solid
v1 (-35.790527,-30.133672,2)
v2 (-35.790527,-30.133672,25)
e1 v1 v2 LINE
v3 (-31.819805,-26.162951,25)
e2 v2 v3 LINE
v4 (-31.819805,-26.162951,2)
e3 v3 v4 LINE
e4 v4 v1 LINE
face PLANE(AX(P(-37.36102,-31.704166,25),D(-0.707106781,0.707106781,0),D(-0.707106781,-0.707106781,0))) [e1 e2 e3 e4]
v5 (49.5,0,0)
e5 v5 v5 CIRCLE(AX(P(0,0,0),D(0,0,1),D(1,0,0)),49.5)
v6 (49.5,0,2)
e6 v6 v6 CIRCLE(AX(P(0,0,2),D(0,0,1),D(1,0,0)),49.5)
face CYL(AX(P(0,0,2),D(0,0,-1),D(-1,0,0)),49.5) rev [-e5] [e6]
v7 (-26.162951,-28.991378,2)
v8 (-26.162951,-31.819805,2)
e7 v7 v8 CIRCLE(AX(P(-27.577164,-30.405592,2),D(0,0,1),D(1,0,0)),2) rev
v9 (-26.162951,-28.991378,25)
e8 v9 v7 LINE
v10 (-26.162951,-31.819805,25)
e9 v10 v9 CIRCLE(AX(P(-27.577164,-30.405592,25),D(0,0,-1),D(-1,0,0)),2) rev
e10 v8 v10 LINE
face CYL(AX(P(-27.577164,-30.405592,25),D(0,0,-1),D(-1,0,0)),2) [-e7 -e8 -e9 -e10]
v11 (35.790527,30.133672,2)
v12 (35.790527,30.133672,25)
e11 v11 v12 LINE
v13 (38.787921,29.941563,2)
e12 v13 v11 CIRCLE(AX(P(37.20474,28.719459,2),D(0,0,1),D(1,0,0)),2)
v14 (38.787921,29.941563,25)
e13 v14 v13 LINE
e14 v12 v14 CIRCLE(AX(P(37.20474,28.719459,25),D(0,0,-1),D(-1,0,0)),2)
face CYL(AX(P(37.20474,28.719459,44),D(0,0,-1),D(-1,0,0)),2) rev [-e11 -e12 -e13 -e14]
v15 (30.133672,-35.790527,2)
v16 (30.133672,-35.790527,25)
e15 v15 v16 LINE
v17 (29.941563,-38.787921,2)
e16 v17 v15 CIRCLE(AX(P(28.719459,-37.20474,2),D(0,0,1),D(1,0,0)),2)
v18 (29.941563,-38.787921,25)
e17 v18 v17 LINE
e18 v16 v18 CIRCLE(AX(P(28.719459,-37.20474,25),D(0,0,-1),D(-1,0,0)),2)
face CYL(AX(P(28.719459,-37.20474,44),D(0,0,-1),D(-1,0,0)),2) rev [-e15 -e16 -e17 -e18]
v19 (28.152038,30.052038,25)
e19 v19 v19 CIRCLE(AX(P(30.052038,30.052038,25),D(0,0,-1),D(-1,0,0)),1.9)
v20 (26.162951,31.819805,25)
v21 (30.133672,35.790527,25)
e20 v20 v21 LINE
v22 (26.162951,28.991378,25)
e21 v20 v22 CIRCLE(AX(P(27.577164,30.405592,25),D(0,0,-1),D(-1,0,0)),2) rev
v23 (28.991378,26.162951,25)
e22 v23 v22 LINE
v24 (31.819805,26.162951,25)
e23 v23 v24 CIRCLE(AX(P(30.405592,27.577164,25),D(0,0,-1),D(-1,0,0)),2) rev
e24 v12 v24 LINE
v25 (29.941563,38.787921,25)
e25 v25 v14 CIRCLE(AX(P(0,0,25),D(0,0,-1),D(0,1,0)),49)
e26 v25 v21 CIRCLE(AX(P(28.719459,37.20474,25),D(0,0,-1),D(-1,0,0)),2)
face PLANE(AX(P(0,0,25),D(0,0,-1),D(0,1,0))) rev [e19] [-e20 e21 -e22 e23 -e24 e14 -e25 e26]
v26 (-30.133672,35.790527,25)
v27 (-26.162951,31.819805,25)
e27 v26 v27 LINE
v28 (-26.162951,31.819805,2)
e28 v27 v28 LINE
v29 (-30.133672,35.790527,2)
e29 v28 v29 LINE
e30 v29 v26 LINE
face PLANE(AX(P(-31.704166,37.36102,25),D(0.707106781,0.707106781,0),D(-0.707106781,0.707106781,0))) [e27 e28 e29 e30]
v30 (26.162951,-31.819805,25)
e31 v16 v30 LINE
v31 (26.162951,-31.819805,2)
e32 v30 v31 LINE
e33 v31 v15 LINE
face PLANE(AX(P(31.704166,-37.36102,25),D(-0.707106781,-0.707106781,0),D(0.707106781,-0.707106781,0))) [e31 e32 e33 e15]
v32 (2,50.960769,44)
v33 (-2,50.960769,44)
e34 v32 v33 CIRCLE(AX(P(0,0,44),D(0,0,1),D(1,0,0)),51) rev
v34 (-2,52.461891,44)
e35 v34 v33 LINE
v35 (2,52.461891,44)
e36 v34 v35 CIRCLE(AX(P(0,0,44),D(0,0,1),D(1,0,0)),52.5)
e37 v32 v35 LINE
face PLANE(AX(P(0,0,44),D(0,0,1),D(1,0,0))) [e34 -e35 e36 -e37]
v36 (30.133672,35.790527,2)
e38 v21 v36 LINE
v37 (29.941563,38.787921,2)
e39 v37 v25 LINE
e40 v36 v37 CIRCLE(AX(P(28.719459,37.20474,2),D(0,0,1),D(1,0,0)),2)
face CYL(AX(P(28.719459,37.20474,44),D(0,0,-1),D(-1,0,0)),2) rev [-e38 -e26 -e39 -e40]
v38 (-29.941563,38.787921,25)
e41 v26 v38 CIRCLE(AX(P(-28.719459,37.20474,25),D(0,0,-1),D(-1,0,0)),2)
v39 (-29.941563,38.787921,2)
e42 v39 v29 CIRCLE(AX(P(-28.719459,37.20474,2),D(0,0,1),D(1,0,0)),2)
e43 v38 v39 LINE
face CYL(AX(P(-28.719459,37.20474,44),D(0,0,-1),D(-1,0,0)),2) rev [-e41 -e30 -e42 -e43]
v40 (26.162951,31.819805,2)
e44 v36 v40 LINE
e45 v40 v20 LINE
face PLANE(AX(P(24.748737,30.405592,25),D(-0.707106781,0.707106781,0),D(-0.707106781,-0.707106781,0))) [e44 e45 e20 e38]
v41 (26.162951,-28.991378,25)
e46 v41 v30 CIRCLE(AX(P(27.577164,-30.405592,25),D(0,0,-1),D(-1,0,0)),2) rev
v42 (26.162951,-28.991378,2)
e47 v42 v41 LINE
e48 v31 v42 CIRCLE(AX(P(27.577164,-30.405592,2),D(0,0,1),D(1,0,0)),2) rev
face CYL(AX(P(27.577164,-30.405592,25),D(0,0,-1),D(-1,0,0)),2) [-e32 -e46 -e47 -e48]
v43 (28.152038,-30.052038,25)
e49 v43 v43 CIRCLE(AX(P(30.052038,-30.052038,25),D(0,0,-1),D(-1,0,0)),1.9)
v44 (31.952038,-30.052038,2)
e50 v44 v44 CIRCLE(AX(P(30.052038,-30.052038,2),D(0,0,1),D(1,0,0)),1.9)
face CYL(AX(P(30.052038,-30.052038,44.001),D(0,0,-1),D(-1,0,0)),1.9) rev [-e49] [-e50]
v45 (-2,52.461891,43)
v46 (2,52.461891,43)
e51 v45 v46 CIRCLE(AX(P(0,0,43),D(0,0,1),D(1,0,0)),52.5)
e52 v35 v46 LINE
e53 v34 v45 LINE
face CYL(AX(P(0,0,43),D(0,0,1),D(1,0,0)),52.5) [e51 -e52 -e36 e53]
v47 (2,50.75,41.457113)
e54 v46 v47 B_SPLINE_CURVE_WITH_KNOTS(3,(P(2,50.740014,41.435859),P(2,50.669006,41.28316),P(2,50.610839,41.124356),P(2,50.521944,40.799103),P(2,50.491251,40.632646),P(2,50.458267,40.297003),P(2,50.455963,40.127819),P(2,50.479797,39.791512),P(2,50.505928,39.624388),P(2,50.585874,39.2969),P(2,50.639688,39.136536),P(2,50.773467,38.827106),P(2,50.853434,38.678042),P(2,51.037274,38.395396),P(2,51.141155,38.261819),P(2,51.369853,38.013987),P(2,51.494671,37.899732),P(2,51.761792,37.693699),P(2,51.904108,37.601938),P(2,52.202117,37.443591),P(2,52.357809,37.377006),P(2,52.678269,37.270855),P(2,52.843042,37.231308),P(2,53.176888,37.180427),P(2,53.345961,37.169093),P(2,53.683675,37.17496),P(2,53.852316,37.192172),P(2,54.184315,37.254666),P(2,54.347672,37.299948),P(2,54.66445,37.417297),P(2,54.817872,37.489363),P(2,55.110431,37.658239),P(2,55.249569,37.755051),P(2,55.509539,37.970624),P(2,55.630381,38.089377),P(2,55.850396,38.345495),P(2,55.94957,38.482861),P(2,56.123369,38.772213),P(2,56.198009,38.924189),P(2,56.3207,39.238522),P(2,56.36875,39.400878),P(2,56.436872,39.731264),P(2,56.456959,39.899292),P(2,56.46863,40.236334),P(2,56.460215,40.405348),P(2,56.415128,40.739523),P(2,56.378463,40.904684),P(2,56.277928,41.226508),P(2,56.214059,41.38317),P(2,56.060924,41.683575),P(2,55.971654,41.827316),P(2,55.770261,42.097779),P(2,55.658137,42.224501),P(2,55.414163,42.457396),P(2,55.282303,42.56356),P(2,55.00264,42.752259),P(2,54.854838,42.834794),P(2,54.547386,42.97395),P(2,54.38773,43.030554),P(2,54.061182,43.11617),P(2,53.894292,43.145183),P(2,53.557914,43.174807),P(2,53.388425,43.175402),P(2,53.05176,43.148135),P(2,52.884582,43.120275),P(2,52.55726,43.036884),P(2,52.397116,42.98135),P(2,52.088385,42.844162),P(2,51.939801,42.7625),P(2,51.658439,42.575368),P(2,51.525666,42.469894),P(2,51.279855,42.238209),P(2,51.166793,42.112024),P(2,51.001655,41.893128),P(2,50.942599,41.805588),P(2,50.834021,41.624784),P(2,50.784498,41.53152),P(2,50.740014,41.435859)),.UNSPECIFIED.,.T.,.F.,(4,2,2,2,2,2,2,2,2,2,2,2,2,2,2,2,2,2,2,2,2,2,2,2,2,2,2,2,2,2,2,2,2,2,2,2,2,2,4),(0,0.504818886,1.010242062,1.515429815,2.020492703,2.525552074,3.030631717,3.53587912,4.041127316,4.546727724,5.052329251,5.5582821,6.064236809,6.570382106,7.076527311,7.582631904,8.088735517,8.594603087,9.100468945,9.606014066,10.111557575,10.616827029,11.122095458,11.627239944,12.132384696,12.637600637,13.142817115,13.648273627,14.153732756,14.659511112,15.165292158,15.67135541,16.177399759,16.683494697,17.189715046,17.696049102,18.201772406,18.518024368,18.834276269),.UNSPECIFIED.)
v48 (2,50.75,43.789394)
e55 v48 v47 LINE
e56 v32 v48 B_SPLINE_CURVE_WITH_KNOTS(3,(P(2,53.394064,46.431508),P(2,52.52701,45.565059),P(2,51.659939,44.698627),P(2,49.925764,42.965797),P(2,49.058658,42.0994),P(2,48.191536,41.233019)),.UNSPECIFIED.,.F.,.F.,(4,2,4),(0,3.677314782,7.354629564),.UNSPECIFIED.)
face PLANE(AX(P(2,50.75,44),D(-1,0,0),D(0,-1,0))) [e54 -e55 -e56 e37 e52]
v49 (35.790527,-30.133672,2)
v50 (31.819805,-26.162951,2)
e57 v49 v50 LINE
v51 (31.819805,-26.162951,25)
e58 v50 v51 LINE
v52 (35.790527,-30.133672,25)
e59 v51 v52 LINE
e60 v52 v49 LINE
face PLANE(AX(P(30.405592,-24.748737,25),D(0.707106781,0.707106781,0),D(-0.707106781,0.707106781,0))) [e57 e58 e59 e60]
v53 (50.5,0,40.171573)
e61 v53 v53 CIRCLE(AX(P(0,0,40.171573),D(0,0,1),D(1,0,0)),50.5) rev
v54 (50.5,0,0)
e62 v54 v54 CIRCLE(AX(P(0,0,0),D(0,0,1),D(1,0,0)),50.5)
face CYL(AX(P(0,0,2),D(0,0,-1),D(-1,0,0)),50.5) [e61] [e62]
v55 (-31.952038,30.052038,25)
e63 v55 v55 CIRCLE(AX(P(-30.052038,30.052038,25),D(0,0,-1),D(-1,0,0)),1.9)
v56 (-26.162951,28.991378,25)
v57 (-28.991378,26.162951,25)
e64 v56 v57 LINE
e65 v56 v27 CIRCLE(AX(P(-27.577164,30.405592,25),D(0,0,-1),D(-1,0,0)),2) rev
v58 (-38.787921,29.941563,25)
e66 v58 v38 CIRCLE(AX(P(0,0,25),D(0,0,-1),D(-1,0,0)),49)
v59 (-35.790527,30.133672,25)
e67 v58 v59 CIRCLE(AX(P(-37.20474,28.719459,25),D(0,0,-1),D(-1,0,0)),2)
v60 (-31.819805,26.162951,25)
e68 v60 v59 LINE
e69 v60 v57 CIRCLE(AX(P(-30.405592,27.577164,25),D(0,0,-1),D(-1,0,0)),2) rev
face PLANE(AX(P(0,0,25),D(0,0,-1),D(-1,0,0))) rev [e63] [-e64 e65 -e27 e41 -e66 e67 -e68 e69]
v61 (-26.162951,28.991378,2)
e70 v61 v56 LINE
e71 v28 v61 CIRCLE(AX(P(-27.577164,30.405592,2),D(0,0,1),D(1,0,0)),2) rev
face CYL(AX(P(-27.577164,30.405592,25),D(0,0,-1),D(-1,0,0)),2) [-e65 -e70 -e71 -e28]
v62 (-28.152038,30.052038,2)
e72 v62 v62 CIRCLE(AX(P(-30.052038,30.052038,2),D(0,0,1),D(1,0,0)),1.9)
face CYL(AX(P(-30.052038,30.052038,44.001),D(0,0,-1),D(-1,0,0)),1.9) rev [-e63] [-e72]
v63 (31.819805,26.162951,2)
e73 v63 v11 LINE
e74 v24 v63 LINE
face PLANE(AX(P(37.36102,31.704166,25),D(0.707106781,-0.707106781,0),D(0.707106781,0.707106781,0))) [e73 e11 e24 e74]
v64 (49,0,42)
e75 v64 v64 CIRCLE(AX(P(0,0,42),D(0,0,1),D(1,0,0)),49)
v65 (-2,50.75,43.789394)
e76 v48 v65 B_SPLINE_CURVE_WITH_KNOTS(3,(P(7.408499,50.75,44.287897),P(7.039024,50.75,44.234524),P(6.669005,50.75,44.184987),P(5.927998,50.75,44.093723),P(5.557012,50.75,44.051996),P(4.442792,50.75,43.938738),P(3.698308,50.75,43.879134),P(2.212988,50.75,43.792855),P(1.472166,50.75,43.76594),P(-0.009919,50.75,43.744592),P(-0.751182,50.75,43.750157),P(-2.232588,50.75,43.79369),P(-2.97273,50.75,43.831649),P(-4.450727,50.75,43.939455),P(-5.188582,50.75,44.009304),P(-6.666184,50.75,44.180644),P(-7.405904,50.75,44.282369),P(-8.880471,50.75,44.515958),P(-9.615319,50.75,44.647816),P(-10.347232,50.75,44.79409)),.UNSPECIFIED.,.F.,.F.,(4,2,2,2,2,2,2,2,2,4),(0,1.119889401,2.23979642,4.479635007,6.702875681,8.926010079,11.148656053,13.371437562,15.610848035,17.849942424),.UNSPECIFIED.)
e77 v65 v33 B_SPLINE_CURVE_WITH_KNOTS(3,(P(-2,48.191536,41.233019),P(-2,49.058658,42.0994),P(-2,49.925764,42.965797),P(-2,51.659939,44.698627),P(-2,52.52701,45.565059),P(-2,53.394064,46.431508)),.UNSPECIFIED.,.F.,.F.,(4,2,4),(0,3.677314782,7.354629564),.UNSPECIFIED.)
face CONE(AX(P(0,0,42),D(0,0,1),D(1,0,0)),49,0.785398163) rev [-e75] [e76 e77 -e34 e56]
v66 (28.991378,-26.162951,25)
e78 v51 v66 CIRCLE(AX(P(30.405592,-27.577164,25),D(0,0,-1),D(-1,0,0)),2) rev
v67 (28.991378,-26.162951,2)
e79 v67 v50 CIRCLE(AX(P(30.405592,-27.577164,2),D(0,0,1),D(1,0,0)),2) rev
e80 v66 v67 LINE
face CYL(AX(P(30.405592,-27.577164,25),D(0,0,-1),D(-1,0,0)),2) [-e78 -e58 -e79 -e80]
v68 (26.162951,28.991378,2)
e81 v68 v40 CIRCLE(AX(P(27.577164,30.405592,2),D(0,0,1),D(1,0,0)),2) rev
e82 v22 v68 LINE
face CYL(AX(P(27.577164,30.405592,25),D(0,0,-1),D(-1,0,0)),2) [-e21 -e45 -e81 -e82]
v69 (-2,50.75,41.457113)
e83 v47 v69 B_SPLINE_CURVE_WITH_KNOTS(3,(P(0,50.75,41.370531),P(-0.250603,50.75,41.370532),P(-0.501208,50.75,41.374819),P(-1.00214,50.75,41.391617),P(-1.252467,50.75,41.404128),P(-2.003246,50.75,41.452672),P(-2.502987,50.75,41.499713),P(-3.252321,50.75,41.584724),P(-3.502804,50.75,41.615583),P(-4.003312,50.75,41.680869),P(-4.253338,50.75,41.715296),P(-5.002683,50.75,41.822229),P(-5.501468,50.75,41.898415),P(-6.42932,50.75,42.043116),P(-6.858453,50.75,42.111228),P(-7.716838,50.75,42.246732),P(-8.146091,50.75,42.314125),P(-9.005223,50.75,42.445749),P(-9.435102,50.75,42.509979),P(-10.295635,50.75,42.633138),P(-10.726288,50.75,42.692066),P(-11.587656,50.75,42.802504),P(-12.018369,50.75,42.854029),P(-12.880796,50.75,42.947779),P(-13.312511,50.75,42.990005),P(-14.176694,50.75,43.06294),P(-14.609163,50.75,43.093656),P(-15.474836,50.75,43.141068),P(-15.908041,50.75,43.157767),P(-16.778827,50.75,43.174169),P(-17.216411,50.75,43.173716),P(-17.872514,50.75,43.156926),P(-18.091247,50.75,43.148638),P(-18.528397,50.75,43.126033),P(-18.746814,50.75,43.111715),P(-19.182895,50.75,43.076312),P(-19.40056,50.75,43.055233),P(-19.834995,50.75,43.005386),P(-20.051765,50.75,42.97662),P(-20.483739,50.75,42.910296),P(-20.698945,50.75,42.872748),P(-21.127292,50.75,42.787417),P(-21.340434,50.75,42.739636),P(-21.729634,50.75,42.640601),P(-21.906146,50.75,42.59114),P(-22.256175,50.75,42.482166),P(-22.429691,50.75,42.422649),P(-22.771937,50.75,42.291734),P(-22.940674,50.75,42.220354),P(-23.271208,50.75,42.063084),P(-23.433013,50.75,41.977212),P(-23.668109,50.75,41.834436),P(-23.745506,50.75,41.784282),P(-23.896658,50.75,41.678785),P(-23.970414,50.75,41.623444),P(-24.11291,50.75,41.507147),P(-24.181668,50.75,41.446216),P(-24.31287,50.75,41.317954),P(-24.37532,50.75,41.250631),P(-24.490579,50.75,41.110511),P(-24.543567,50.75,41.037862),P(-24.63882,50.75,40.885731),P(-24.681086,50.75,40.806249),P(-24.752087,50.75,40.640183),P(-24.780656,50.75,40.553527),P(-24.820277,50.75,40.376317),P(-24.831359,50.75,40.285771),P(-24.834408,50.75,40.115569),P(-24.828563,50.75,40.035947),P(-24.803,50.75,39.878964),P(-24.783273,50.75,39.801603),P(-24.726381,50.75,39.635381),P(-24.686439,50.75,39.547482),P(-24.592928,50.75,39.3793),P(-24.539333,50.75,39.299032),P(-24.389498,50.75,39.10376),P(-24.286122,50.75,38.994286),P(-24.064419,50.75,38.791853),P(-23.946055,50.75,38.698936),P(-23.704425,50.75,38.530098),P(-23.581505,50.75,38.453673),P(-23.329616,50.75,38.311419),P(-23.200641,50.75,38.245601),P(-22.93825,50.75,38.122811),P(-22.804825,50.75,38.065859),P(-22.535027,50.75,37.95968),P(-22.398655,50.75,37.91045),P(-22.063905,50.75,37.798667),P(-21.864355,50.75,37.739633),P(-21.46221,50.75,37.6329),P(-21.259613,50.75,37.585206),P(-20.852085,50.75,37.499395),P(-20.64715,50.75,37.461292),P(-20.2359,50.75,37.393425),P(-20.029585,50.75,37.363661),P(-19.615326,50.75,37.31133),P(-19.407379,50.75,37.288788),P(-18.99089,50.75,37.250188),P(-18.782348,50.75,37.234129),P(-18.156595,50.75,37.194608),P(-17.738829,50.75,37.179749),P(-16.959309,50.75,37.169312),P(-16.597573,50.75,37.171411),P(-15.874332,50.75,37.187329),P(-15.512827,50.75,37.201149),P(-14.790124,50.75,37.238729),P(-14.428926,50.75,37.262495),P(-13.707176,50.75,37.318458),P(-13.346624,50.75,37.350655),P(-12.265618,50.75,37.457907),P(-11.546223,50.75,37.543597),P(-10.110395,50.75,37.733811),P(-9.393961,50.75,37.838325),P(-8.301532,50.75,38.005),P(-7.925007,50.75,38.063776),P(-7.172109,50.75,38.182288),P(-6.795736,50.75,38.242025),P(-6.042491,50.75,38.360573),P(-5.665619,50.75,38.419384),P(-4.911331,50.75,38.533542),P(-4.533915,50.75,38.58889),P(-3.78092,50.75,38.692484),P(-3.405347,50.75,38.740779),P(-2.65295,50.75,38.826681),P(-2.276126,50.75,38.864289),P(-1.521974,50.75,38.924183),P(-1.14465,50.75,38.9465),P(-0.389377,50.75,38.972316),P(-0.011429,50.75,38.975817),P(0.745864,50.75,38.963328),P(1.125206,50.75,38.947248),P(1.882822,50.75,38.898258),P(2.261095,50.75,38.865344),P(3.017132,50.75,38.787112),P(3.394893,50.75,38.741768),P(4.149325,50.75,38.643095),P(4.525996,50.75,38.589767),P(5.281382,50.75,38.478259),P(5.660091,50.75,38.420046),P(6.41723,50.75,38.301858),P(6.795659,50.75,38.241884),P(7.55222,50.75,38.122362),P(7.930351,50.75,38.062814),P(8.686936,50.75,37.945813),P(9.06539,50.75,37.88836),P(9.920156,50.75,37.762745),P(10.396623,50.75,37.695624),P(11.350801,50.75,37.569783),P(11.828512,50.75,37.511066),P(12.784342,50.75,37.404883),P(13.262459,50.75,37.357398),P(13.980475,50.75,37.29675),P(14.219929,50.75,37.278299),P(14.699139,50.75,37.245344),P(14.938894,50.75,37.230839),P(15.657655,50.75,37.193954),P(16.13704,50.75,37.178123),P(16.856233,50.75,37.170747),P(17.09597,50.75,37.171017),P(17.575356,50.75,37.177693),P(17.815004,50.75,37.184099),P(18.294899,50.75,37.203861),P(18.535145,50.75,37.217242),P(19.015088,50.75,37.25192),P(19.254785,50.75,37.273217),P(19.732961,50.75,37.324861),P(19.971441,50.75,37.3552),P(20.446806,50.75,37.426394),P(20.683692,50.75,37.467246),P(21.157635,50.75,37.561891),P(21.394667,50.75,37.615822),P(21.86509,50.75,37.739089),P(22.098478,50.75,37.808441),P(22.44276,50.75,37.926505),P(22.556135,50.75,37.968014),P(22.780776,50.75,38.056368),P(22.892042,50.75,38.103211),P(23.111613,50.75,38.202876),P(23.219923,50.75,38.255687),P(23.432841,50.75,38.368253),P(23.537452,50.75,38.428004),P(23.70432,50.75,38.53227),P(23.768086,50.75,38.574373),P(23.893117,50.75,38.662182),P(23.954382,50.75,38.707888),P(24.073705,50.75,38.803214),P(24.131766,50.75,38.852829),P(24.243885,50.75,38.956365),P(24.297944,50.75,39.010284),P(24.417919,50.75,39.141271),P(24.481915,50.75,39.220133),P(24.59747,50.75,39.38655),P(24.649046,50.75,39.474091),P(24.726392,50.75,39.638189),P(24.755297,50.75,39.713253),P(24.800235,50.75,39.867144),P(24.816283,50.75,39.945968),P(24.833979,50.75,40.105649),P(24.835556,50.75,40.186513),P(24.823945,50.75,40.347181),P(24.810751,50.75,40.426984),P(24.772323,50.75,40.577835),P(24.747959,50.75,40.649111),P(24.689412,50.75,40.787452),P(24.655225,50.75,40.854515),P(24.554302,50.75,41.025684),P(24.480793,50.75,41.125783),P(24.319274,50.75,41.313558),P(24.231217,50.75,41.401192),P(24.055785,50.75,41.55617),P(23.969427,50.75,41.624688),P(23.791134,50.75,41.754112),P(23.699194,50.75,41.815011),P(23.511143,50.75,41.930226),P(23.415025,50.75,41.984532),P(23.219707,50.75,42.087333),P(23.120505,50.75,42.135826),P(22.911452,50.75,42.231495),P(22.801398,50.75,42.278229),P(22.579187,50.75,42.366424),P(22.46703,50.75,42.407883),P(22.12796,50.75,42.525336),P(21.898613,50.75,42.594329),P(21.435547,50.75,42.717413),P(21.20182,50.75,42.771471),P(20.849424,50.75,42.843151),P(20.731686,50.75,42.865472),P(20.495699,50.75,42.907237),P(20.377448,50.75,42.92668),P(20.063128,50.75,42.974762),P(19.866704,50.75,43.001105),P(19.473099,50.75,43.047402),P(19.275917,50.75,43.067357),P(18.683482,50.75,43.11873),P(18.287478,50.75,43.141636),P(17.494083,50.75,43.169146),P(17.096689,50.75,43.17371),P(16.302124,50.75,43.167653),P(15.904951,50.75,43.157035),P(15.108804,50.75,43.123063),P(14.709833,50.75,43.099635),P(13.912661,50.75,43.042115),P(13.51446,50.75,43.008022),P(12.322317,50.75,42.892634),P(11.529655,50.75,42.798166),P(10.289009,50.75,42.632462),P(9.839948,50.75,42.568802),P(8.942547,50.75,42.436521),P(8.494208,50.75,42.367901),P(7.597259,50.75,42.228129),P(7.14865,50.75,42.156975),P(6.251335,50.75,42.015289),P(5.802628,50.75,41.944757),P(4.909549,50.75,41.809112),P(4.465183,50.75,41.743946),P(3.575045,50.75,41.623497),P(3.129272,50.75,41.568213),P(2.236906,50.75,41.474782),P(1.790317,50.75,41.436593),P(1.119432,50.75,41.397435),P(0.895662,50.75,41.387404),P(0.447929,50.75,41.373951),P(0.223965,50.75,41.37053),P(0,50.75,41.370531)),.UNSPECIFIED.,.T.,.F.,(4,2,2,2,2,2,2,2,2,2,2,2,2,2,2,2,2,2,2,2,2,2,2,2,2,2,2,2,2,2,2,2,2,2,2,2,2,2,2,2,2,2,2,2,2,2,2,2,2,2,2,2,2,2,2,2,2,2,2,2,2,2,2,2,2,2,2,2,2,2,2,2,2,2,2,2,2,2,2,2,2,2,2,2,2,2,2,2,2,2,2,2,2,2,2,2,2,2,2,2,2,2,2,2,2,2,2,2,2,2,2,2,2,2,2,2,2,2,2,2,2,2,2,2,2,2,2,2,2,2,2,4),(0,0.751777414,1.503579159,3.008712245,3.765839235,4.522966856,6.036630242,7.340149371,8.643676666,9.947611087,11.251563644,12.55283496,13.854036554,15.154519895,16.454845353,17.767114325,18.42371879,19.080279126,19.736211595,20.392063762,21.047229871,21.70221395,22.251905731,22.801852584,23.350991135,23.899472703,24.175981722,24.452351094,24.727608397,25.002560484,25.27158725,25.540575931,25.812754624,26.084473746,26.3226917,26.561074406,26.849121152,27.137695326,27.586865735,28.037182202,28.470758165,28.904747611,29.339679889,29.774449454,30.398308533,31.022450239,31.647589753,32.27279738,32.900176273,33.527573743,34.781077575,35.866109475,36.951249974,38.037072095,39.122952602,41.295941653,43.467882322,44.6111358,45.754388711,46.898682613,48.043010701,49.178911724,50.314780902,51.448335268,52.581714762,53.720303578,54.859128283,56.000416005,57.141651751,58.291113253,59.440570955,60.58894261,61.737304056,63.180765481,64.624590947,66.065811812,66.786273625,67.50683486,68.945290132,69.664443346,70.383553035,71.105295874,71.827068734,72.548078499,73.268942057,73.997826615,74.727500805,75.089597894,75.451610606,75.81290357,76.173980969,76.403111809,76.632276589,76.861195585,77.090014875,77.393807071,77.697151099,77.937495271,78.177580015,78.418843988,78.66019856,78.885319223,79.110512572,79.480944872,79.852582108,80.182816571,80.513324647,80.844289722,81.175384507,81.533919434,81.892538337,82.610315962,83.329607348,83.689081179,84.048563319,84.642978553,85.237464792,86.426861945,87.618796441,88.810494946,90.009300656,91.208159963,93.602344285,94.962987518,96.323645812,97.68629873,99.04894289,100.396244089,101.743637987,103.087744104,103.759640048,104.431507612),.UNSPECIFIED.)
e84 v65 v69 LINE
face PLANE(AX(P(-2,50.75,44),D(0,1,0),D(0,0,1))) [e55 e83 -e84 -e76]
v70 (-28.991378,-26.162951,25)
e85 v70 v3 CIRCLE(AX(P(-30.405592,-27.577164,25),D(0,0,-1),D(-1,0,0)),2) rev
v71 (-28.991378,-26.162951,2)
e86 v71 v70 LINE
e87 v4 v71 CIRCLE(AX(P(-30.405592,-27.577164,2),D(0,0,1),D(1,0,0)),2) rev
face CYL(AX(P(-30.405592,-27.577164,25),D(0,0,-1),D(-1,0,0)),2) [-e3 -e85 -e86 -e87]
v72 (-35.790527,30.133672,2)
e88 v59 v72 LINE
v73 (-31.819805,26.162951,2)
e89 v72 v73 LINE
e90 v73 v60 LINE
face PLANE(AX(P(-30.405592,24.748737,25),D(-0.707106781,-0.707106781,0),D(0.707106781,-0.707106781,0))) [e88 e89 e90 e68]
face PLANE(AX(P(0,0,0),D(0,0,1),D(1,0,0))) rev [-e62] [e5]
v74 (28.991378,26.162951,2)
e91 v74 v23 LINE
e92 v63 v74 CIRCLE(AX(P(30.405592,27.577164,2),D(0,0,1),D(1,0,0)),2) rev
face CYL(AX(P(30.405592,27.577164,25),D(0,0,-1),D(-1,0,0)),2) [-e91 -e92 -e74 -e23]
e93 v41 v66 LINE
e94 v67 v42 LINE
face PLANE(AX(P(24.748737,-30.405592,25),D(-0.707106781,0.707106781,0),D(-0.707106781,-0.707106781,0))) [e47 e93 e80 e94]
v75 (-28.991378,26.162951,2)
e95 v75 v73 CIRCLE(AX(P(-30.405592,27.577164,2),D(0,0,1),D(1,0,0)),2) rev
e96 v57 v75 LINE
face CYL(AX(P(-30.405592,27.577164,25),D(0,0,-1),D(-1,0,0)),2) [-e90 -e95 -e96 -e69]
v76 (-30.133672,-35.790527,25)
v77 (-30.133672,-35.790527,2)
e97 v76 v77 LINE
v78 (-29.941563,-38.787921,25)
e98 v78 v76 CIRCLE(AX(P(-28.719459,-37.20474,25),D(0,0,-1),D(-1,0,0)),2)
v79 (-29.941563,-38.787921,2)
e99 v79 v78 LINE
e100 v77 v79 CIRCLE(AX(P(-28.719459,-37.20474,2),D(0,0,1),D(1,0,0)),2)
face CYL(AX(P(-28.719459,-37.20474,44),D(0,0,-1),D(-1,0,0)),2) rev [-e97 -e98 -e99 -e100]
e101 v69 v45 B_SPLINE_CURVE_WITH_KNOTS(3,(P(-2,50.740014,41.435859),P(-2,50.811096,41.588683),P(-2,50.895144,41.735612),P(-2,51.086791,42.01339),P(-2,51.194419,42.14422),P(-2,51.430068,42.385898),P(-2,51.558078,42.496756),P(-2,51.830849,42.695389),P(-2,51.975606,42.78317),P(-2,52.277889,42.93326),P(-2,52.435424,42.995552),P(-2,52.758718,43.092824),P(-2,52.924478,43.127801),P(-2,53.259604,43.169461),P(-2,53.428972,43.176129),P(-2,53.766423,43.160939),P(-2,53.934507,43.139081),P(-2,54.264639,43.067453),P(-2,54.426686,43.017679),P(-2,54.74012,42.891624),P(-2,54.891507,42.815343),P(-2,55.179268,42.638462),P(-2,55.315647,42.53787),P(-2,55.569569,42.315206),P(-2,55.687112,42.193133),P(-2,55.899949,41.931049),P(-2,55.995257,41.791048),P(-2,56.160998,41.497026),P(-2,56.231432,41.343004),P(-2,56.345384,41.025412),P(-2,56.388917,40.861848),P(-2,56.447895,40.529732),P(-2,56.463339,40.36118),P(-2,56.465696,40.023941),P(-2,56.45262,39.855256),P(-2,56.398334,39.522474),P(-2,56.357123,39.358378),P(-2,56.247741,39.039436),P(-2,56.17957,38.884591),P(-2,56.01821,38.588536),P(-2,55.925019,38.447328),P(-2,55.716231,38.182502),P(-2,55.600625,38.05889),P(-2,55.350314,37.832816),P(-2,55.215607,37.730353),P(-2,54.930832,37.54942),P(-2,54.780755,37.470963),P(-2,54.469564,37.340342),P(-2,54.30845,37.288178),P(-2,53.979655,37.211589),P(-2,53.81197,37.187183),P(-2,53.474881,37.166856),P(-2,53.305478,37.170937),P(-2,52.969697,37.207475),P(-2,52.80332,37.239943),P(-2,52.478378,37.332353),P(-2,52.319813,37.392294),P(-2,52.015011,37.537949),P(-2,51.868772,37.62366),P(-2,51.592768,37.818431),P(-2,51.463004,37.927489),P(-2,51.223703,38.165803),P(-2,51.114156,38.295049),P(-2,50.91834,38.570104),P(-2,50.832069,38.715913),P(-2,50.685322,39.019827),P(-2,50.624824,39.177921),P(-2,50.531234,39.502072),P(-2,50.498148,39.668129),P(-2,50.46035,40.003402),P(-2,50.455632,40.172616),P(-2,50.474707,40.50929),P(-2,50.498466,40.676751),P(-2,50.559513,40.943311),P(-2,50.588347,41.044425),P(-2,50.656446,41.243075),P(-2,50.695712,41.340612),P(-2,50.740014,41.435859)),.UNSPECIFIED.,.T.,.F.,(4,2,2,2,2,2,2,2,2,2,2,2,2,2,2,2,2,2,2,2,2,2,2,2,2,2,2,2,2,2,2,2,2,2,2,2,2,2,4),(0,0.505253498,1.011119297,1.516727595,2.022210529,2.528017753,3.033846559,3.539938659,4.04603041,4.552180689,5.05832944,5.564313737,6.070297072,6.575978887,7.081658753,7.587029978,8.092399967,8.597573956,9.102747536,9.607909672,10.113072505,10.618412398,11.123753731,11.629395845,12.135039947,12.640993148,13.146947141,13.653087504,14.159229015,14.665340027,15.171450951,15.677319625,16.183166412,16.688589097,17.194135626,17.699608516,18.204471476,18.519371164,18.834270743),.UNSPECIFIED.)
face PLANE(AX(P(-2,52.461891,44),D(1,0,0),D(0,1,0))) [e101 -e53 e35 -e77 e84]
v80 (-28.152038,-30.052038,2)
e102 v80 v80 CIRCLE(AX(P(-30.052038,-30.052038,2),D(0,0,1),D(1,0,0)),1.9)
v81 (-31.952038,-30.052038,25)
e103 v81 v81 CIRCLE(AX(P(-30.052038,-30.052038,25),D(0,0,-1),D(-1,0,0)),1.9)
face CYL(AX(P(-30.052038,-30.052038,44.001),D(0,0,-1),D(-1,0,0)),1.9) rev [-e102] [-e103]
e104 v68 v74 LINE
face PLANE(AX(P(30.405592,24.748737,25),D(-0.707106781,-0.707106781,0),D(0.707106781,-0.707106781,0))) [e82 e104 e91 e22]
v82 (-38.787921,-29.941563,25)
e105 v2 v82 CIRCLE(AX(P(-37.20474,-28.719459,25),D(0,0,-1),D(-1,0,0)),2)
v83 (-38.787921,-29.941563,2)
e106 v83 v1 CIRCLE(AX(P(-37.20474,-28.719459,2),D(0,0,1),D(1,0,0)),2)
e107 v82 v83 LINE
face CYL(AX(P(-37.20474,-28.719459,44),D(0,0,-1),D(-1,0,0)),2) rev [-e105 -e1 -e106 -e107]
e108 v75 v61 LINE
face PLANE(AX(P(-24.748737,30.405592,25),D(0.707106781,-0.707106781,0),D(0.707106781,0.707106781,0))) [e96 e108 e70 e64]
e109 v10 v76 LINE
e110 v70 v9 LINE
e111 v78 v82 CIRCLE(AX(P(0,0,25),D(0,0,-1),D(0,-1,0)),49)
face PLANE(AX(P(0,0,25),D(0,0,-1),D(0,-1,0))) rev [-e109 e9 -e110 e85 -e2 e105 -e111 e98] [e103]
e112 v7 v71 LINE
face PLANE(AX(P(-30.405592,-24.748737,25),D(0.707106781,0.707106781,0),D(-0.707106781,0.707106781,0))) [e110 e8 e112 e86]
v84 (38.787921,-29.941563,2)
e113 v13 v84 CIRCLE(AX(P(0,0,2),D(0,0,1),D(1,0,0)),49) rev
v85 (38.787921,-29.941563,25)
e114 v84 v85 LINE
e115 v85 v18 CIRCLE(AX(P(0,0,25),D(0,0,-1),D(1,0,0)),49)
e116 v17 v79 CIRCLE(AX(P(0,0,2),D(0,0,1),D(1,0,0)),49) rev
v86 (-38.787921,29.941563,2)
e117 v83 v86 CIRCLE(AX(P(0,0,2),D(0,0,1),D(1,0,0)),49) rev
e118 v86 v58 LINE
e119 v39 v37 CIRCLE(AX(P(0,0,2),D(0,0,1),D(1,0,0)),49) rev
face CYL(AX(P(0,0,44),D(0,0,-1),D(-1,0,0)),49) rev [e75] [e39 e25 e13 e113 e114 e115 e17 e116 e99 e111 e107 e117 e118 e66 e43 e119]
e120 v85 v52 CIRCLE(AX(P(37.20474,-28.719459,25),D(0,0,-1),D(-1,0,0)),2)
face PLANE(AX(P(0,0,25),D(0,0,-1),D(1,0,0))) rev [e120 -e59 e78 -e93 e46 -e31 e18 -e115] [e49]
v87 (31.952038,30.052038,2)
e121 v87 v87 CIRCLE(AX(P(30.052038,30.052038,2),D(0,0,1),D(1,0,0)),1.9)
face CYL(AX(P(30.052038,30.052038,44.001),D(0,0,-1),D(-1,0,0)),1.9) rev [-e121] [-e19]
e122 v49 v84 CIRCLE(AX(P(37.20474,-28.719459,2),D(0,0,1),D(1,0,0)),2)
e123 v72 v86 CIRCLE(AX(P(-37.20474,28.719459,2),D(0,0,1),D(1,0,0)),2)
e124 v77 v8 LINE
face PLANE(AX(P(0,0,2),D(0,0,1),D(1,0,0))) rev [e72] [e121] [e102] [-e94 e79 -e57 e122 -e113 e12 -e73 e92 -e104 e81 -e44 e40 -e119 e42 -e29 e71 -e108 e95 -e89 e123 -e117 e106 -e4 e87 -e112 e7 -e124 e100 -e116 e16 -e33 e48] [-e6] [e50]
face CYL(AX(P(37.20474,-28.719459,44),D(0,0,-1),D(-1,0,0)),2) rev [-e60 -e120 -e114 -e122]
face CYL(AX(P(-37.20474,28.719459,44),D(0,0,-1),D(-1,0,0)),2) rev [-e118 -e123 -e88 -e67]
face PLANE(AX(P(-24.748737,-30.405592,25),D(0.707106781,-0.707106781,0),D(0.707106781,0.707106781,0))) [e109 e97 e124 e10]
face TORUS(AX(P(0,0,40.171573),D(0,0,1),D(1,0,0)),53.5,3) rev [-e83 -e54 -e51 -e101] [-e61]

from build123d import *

# Parameters (mm, degrees)
SKETCH2_R                = 50.5
BOSS_EXTRUDE2_DEPTH      = 2
SKETCH3_R                = 50.5
SKETCH3_R_2              = 49
BOSS_EXTRUDE3_DEPTH      = 42
BOSS_EXTRUDE4_START      = -1
SKETCH4_R                = 52.5
SKETCH4_R_2              = 49
BOSS_EXTRUDE4_DEPTH      = 1
FILLET1_R                = 3
CHAMFER1_SIZE            = 2
SKETCH5_R                = 3
SKETCH5_R_2              = 2
SKETCH5_R_3              = 3.125
SKETCH5_R_4              = 3.625
CUT_EXTRUDE3_DEPTH       = 87.304692804
CIRPATTERN1_COUNT        = 4
BOSS_EXTRUDE6_DEPTH      = 25
FILLET3_R                = 2
CIRPATTERN2_COUNT        = 4
FILLET3_OF_CIRPATTERN2_R = 2
CUT_EXTRUDE4_DEPTH       = 87.304692804
SKETCH12_R               = 49.5
CUT_EXTRUDE5_DEPTH       = 2
CUT_EXTRUDE6_REACH       = 88.305
SKETCH10_R               = 1.9
CIRPATTERN3_COUNT        = 4


with BuildPart() as part:
    # Sketch2 → Boss-Extrude2 (new body)
    with BuildSketch(Plane.XY):
        Circle(SKETCH2_R)
    extrude(amount=BOSS_EXTRUDE2_DEPTH)

    # Sketch3 → Boss-Extrude3 (add)
    with BuildSketch(Plane.XY.offset(2)):
        Circle(SKETCH3_R)
        with Locations(Location((0, 0, 0), (0, 0, 180))):
            Circle(SKETCH3_R_2, mode=Mode.SUBTRACT)
    extrude(amount=BOSS_EXTRUDE3_DEPTH)

    # Sketch4 → Boss-Extrude4 (add)
    with BuildSketch(Plane.XY.offset(44).offset(BOSS_EXTRUDE4_START)):
        Circle(SKETCH4_R)
        with Locations(Location((0, 0, 0), (0, 0, 180))):
            Circle(SKETCH4_R_2, mode=Mode.SUBTRACT)
    extrude(amount=BOSS_EXTRUDE4_DEPTH)

    # Fillet1
    # the kernel refuses this fillet: 3 mm, written as the material it adds along each edge
    with BuildSketch(Plane(origin=(0, 0, 43), x_dir=(1, 0, 0), z_dir=(0, 1, 0))) as fillet1_piece_1:
        with BuildLine():
            CenterArc((53.5, 2.828427125), FILLET1_R, 180, 70.528779366)
            Line((52.5, 0), (52.48, -0.056568542))
            ThreePointArc((52.48, -0.056568542), (51.5, -0.06), (50.5, -0.06))
            Line((50.5, -0.06), (50.44, 0))
            Line((50.44, 0), (50.44, 2.828427125))
            Line((50.44, 2.828427125), (50.5, 2.828427125))
        make_face()
    revolve(axis=Axis((0, 0, 43), (0, 0, -1)))

    # Chamfer1
    chamfer1_edges = [part.edges().sort_by_distance(p)[0] for p in [
        (49, 0, 44),
    ]]
    chamfer(chamfer1_edges, length=CHAMFER1_SIZE)

    # Sketch5 → Cut-Extrude3 (cut, through all)
    with BuildSketch(Plane.XY):
        with Locations((0, 20)):
            Circle(SKETCH5_R)
        with Locations((0, 10)):
            Circle(SKETCH5_R_2)
        with Locations((0, 30)):
            Circle(SKETCH5_R_2)
        with Locations((10.125, 20)):
            Circle(SKETCH5_R_3)
        with Locations((-10.125, 20)):
            Circle(SKETCH5_R_4)
    cut_extrude3 = extrude(amount=CUT_EXTRUDE3_DEPTH, mode=Mode.SUBTRACT)

    # CirPattern1: Cut-Extrude3 ×4 about axis
    cirpattern1_axis = Axis((0, 0, 0), (0, 0, 1))
    for i in range(1, CIRPATTERN1_COUNT):
        add(cut_extrude3.rotate(cirpattern1_axis, i * 360 / CIRPATTERN1_COUNT), mode=Mode.SUBTRACT)

    # Sketch7 → Boss-Extrude6 (add)
    with BuildSketch(Plane(origin=(0, 0, 0), x_dir=(-1, 0, 0), z_dir=(0, 0, -1))):
        with BuildLine():
            Line((31.704166175, 37.361020424), (24.748737342, 30.405591591))
            Line((24.748737342, 30.405591591), (30.405591591, 24.748737342))
            Line((30.405591591, 24.748737342), (37.361020424, 31.704166175))
            ThreePointArc((37.361020424, 31.704166175), (34.648232278, 34.648232278), (31.704166175, 37.361020424))
        make_face()
    boss_extrude6 = extrude(amount=-BOSS_EXTRUDE6_DEPTH)

    # Fillet3
    fillet3_edges = [part.edges().sort_by_distance(p)[0] for p in [
        (-30.405591591, 24.748737342, 13.5),
        (-24.748737342, 30.405591591, 13.5),
        (-31.704166175, 37.361020424, 13.5),
        (-37.361020424, 31.704166175, 13.5),
    ]]
    fillet(fillet3_edges, radius=FILLET3_R)

    # CirPattern2: Boss-Extrude6 ×4 about axis
    cirpattern2_axis = Axis((0, 0, 0), (0, 0, 1))
    for i in range(1, CIRPATTERN2_COUNT):
        add(boss_extrude6.rotate(cirpattern2_axis, i * 360 / CIRPATTERN2_COUNT))

    # Fillet3 of CirPattern2
    fillet3_of_cirpattern2_edges = [part.edges().sort_by_distance(p)[0] for p in [
        (-24.748737342, -30.405591591, 13.5),
        (-30.405591591, -24.748737342, 13.5),
        (-37.361020424, -31.704166175, 13.5),
        (-31.704166175, -37.361020424, 13.5),
        (30.405591591, -24.748737342, 13.5),
        (24.748737342, -30.405591591, 13.5),
        (31.704166175, -37.361020424, 13.5),
        (37.361020424, -31.704166175, 13.5),
        (24.748737342, 30.405591591, 13.5),
        (30.405591591, 24.748737342, 13.5),
        (37.361020424, 31.704166175, 13.5),
        (31.704166175, 37.361020424, 13.5),
    ]]
    fillet(fillet3_of_cirpattern2_edges, radius=FILLET3_OF_CIRPATTERN2_R)

    # Sketch9 → Cut-Extrude4 (cut, through all)
    with BuildSketch(Plane.XY):
        with BuildLine():
            Line((-2, 52.46189093), (-2, 50.75))
            Line((-2, 50.75), (2, 50.75))
            Line((2, 50.75), (2, 52.46189093))
            ThreePointArc((2, 52.46189093), (0, 52.5), (-2, 52.46189093))
        make_face()
    extrude(amount=CUT_EXTRUDE4_DEPTH, mode=Mode.SUBTRACT)

    # Sketch12 → Cut-Extrude5 (cut)
    with BuildSketch(Plane.XY):
        Circle(SKETCH12_R)
    extrude(amount=CUT_EXTRUDE5_DEPTH, mode=Mode.SUBTRACT)

    # Sketch10 → Cut-Extrude6 (cut, up to next)
    with BuildSketch(Plane.XY, mode=Mode.PRIVATE) as cut_extrude6_sk1:
        with Locations(Location((-30.0520382, 30.0520382, 0), (0, 0, 180))):
            Circle(SKETCH10_R)
    cut_extrude6_tool1 = extrude(cut_extrude6_sk1.sketch, amount=CUT_EXTRUDE6_REACH, mode=Mode.PRIVATE) & part.part
    cut_extrude6 = cut_extrude6_tool1.solids().sort_by_distance((-30.052038, 30.052038, 0))[0]
    add(cut_extrude6, mode=Mode.SUBTRACT)

    # CirPattern3: Cut-Extrude6 ×4 about axis
    cirpattern3_axis = Axis((0, 0, 0), (0, 0, 1))
    for i in range(1, CIRPATTERN3_COUNT):
        add(cut_extrude6.rotate(cirpattern3_axis, i * 360 / CIRPATTERN3_COUNT), mode=Mode.SUBTRACT)


solid = part.part
